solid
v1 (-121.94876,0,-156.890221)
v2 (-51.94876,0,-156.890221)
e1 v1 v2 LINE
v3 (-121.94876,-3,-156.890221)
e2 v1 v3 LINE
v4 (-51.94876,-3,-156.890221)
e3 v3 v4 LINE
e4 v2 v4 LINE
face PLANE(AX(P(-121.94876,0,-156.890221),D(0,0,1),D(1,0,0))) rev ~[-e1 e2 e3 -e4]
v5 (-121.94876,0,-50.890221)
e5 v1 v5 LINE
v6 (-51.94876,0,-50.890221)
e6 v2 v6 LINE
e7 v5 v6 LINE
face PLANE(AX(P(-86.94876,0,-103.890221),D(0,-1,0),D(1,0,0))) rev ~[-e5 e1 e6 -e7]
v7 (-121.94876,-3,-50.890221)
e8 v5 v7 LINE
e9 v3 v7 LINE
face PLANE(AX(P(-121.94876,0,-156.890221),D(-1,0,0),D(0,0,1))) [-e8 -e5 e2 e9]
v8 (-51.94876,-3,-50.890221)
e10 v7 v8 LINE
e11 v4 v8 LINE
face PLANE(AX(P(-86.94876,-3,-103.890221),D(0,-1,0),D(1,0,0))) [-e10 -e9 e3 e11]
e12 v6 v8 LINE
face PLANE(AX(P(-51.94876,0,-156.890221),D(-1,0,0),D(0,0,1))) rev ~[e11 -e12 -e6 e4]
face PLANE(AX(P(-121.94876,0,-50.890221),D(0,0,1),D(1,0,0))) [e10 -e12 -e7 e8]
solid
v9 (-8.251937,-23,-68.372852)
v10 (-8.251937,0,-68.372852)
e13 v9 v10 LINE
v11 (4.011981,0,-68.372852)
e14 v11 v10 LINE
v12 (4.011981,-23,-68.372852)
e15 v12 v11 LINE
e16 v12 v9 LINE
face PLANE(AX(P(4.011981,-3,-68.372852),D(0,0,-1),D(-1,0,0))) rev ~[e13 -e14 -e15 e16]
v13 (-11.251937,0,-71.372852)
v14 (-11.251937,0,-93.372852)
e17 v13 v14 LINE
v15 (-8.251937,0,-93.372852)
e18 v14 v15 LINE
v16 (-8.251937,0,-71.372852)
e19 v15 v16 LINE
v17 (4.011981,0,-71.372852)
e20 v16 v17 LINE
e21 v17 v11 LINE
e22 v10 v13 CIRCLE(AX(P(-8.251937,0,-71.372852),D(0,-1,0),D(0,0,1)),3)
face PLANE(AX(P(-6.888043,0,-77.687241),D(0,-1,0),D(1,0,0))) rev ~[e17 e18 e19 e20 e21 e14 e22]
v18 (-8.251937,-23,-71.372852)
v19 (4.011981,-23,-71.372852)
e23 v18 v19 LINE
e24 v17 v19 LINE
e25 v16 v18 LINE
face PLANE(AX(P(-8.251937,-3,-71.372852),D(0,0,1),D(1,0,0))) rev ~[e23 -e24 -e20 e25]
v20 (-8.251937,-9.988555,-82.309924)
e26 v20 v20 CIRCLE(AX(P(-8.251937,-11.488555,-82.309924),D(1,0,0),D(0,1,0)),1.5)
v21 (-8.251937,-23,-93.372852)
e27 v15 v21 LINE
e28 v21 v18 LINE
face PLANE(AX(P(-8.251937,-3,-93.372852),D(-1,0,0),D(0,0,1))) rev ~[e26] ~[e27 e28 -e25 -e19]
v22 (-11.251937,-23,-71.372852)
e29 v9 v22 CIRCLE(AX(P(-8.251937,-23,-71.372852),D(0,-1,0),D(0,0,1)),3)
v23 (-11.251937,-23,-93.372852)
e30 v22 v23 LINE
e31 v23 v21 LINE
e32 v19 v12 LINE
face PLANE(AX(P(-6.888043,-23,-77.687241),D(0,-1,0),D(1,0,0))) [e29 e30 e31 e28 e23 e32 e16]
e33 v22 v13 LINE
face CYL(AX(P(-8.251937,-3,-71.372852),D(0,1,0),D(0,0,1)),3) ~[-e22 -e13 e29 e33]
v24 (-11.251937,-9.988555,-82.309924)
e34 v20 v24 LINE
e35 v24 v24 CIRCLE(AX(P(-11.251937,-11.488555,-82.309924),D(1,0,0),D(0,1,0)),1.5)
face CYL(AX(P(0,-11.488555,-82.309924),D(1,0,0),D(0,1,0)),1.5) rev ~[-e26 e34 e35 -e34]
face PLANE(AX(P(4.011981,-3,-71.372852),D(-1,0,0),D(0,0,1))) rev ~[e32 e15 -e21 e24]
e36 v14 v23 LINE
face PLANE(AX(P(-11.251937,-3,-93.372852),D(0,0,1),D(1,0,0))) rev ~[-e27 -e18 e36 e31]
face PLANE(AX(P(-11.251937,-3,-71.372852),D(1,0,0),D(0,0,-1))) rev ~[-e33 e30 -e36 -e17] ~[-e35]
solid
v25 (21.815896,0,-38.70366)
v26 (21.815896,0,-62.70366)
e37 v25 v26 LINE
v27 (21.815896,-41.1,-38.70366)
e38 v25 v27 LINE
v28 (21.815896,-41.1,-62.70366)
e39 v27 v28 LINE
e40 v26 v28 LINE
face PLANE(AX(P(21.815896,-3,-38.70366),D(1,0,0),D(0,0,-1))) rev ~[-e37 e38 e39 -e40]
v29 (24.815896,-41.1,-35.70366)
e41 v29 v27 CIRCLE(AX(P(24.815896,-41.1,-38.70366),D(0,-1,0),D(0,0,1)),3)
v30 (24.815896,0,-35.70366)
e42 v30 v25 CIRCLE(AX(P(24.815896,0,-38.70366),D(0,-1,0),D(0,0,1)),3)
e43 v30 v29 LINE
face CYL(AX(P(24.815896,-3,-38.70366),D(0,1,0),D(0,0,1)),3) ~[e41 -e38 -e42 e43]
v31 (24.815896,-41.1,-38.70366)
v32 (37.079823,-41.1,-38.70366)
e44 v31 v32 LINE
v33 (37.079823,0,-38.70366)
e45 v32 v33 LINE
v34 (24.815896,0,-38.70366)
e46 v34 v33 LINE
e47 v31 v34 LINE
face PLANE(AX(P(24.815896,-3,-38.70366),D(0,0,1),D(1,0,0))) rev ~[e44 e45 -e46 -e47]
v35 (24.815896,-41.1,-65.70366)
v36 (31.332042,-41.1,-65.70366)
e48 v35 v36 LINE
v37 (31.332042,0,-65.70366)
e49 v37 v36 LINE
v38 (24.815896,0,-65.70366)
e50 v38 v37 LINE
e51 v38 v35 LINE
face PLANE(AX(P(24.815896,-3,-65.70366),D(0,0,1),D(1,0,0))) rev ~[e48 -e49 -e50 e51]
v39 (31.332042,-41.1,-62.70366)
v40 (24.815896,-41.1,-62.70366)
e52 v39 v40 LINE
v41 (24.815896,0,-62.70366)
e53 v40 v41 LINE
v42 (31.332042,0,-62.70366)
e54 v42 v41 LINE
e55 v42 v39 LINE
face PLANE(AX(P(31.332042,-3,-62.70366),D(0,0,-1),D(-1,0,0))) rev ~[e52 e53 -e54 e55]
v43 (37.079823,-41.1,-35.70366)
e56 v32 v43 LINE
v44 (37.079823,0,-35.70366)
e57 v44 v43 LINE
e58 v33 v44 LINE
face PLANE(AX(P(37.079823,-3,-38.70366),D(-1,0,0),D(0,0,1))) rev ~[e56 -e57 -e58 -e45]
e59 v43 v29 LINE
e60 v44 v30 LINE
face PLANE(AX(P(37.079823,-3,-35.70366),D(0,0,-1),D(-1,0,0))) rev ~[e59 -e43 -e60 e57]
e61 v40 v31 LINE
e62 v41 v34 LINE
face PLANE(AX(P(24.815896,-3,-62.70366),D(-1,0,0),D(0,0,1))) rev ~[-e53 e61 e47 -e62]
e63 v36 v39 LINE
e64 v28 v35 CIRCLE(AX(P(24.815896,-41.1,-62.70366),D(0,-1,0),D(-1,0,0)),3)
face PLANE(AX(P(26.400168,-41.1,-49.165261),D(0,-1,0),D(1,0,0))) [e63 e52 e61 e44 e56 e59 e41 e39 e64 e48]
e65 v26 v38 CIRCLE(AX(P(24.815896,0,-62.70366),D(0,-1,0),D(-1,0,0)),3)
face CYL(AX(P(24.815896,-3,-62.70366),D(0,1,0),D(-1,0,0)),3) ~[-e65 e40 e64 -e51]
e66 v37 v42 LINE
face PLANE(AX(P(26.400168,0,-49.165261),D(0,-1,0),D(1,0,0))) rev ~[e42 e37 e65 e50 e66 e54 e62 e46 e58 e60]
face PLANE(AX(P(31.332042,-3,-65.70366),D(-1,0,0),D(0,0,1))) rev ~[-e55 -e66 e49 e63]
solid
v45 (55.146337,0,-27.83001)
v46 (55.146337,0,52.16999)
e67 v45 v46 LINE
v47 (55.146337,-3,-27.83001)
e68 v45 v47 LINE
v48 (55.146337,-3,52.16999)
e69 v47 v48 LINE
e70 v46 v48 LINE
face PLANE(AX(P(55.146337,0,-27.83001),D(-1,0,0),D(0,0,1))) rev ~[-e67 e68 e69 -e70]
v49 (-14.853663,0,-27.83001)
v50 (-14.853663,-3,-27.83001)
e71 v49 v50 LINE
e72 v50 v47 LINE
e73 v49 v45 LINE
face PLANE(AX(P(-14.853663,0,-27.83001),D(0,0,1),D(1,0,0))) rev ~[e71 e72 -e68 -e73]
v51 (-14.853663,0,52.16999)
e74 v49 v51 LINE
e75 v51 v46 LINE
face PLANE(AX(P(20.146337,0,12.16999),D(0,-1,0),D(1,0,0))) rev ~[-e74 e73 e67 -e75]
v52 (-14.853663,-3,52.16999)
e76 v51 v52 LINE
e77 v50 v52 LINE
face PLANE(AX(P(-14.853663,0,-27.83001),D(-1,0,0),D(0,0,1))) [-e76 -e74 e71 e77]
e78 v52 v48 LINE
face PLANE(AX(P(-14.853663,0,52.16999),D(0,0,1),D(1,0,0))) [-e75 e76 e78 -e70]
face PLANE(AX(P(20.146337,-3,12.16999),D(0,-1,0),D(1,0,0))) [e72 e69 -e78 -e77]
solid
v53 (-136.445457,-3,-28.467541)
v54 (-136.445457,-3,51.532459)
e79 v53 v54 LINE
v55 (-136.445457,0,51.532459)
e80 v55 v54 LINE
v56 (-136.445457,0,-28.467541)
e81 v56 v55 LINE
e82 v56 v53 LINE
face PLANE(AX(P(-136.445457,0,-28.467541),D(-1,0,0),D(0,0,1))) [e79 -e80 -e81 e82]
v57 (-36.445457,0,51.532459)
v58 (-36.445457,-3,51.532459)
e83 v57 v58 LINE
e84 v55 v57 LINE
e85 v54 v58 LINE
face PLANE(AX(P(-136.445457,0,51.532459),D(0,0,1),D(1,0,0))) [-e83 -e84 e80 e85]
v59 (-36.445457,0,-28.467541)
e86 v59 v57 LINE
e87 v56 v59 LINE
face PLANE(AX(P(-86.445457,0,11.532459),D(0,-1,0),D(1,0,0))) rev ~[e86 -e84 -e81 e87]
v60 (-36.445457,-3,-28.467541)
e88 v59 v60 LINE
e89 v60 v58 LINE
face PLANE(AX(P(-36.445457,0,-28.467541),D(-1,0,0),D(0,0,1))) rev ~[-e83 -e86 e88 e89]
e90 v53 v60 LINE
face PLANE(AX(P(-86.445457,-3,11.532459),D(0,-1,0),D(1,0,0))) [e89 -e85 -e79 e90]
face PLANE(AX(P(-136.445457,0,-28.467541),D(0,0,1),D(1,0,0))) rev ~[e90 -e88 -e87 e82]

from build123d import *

# Parameters (mm, degrees)
F0_W     = 70
F0_H     = 80
F1_DEPTH = 3
F2_DEPTH = 3
F0_W_2   = 100
F0_H_2   = 106
F3_DEPTH = 20
F4_R     = 1.5
F5_DEPTH = 25.4
F6_DEPTH = 38.1


with BuildPart() as f1:
    # F0 (on Front) → F1 (new body)
    with BuildSketch(Plane.XZ):
        with Locations((20.1463365555, 12.1699897945)):
            Rectangle(F0_W, F0_H)
    extrude(amount=F1_DEPTH)

    # F0 (on Front) → F2 (join)
    with BuildSketch(Plane.XZ):
        with Locations((20.1463365555, 12.1699897945)):
            Rectangle(F0_W, F0_H)
    extrude(amount=F2_DEPTH)


with BuildPart() as f2:
    # F0 (on Front) → F2, piece 2 (new body)
    with BuildSketch(Plane.XZ):
        with Locations((-86.4454574883, 11.532458514)):
            Rectangle(F0_W_2, F0_H)
    extrude(amount=F2_DEPTH)


with BuildPart() as f2b:
    # F0 (on Front) → F2, piece 3 (new body)
    with BuildSketch(Plane.XZ):
        with Locations((-86.9487600029, -103.8902209401)):
            Rectangle(F0_W, F0_H_2)
    extrude(amount=F2_DEPTH)


with BuildPart() as f2c:
    # F0 (on Front) → F2, piece 4 (new body)
    with BuildSketch(Plane.XZ):
        with BuildLine():
            Line((-11.2519366667, -71.3728516102), (-11.2519366667, -93.3728516102))
            Line((-11.2519366667, -93.3728516102), (-8.2519366667, -93.3728516102))
            Line((-8.2519366667, -93.3728516102), (-8.2519366667, -71.3728516102))
            Line((-8.2519366667, -71.3728516102), (4.0119807236, -71.3728516102))
            Line((4.0119807236, -71.3728516102), (4.0119807236, -68.3728516102))
            Line((4.0119807236, -68.3728516102), (-8.2519366667, -68.3728516102))
            ThreePointArc((-8.2519366667, -68.3728516102), (-10.3732570102, -69.2515312666), (-11.2519366667, -71.3728516102))
        make_face()
    extrude(amount=F2_DEPTH)

    # F3 (add): a face of the model
    f3_faces = [f2c.faces().sort_by_distance(p)[0] for p in [
        (-8.5448508476, -3, -82.3728516102),
    ]]
    extrude(f3_faces, amount=F3_DEPTH)

    # F4 (on Right) → F5 (cut)
    with BuildSketch(Plane.YZ):
        with Locations((-11.4885549992, -82.3099240661)):
            Circle(F4_R)
    extrude(amount=-F5_DEPTH, mode=Mode.SUBTRACT)


with BuildPart() as f2d:
    # F0 (on Front) → F2, piece 5 (new body)
    with BuildSketch(Plane.XZ):
        with BuildLine():
            Line((37.0798228342, -38.7036602497), (37.0798228342, -35.7036602497))
            Line((37.0798228342, -35.7036602497), (24.8158960342, -35.7036602497))
            ThreePointArc((24.8158960342, -35.7036602497), (22.6945756907, -36.5823399062), (21.8158960342, -38.7036602497))
            Line((21.8158960342, -38.7036602497), (21.8158960342, -62.7036602497))
            ThreePointArc((21.8158960342, -62.7036602497), (22.6945756907, -64.8249805933), (24.8158960342, -65.7036602497))
            Line((24.8158960342, -65.7036602497), (31.3320420682, -65.7036602497))
            Line((31.3320420682, -65.7036602497), (31.3320420682, -62.7036602497))
            Line((31.3320420682, -62.7036602497), (24.8158960342, -62.7036602497))
            Line((24.8158960342, -62.7036602497), (24.8158960342, -38.7036602497))
            Line((24.8158960342, -38.7036602497), (37.0798228342, -38.7036602497))
        make_face()
    extrude(amount=F2_DEPTH)

    # F6 (add): a face of the model
    f6_faces = [f2d.faces().sort_by_distance(p)[0] for p in [
        (36.7432240432, -3, -37.2036602497),
    ]]
    extrude(f6_faces, amount=F6_DEPTH)


solid = Compound([f1.part, f2.part, f2b.part, f2c.part, f2d.part])
